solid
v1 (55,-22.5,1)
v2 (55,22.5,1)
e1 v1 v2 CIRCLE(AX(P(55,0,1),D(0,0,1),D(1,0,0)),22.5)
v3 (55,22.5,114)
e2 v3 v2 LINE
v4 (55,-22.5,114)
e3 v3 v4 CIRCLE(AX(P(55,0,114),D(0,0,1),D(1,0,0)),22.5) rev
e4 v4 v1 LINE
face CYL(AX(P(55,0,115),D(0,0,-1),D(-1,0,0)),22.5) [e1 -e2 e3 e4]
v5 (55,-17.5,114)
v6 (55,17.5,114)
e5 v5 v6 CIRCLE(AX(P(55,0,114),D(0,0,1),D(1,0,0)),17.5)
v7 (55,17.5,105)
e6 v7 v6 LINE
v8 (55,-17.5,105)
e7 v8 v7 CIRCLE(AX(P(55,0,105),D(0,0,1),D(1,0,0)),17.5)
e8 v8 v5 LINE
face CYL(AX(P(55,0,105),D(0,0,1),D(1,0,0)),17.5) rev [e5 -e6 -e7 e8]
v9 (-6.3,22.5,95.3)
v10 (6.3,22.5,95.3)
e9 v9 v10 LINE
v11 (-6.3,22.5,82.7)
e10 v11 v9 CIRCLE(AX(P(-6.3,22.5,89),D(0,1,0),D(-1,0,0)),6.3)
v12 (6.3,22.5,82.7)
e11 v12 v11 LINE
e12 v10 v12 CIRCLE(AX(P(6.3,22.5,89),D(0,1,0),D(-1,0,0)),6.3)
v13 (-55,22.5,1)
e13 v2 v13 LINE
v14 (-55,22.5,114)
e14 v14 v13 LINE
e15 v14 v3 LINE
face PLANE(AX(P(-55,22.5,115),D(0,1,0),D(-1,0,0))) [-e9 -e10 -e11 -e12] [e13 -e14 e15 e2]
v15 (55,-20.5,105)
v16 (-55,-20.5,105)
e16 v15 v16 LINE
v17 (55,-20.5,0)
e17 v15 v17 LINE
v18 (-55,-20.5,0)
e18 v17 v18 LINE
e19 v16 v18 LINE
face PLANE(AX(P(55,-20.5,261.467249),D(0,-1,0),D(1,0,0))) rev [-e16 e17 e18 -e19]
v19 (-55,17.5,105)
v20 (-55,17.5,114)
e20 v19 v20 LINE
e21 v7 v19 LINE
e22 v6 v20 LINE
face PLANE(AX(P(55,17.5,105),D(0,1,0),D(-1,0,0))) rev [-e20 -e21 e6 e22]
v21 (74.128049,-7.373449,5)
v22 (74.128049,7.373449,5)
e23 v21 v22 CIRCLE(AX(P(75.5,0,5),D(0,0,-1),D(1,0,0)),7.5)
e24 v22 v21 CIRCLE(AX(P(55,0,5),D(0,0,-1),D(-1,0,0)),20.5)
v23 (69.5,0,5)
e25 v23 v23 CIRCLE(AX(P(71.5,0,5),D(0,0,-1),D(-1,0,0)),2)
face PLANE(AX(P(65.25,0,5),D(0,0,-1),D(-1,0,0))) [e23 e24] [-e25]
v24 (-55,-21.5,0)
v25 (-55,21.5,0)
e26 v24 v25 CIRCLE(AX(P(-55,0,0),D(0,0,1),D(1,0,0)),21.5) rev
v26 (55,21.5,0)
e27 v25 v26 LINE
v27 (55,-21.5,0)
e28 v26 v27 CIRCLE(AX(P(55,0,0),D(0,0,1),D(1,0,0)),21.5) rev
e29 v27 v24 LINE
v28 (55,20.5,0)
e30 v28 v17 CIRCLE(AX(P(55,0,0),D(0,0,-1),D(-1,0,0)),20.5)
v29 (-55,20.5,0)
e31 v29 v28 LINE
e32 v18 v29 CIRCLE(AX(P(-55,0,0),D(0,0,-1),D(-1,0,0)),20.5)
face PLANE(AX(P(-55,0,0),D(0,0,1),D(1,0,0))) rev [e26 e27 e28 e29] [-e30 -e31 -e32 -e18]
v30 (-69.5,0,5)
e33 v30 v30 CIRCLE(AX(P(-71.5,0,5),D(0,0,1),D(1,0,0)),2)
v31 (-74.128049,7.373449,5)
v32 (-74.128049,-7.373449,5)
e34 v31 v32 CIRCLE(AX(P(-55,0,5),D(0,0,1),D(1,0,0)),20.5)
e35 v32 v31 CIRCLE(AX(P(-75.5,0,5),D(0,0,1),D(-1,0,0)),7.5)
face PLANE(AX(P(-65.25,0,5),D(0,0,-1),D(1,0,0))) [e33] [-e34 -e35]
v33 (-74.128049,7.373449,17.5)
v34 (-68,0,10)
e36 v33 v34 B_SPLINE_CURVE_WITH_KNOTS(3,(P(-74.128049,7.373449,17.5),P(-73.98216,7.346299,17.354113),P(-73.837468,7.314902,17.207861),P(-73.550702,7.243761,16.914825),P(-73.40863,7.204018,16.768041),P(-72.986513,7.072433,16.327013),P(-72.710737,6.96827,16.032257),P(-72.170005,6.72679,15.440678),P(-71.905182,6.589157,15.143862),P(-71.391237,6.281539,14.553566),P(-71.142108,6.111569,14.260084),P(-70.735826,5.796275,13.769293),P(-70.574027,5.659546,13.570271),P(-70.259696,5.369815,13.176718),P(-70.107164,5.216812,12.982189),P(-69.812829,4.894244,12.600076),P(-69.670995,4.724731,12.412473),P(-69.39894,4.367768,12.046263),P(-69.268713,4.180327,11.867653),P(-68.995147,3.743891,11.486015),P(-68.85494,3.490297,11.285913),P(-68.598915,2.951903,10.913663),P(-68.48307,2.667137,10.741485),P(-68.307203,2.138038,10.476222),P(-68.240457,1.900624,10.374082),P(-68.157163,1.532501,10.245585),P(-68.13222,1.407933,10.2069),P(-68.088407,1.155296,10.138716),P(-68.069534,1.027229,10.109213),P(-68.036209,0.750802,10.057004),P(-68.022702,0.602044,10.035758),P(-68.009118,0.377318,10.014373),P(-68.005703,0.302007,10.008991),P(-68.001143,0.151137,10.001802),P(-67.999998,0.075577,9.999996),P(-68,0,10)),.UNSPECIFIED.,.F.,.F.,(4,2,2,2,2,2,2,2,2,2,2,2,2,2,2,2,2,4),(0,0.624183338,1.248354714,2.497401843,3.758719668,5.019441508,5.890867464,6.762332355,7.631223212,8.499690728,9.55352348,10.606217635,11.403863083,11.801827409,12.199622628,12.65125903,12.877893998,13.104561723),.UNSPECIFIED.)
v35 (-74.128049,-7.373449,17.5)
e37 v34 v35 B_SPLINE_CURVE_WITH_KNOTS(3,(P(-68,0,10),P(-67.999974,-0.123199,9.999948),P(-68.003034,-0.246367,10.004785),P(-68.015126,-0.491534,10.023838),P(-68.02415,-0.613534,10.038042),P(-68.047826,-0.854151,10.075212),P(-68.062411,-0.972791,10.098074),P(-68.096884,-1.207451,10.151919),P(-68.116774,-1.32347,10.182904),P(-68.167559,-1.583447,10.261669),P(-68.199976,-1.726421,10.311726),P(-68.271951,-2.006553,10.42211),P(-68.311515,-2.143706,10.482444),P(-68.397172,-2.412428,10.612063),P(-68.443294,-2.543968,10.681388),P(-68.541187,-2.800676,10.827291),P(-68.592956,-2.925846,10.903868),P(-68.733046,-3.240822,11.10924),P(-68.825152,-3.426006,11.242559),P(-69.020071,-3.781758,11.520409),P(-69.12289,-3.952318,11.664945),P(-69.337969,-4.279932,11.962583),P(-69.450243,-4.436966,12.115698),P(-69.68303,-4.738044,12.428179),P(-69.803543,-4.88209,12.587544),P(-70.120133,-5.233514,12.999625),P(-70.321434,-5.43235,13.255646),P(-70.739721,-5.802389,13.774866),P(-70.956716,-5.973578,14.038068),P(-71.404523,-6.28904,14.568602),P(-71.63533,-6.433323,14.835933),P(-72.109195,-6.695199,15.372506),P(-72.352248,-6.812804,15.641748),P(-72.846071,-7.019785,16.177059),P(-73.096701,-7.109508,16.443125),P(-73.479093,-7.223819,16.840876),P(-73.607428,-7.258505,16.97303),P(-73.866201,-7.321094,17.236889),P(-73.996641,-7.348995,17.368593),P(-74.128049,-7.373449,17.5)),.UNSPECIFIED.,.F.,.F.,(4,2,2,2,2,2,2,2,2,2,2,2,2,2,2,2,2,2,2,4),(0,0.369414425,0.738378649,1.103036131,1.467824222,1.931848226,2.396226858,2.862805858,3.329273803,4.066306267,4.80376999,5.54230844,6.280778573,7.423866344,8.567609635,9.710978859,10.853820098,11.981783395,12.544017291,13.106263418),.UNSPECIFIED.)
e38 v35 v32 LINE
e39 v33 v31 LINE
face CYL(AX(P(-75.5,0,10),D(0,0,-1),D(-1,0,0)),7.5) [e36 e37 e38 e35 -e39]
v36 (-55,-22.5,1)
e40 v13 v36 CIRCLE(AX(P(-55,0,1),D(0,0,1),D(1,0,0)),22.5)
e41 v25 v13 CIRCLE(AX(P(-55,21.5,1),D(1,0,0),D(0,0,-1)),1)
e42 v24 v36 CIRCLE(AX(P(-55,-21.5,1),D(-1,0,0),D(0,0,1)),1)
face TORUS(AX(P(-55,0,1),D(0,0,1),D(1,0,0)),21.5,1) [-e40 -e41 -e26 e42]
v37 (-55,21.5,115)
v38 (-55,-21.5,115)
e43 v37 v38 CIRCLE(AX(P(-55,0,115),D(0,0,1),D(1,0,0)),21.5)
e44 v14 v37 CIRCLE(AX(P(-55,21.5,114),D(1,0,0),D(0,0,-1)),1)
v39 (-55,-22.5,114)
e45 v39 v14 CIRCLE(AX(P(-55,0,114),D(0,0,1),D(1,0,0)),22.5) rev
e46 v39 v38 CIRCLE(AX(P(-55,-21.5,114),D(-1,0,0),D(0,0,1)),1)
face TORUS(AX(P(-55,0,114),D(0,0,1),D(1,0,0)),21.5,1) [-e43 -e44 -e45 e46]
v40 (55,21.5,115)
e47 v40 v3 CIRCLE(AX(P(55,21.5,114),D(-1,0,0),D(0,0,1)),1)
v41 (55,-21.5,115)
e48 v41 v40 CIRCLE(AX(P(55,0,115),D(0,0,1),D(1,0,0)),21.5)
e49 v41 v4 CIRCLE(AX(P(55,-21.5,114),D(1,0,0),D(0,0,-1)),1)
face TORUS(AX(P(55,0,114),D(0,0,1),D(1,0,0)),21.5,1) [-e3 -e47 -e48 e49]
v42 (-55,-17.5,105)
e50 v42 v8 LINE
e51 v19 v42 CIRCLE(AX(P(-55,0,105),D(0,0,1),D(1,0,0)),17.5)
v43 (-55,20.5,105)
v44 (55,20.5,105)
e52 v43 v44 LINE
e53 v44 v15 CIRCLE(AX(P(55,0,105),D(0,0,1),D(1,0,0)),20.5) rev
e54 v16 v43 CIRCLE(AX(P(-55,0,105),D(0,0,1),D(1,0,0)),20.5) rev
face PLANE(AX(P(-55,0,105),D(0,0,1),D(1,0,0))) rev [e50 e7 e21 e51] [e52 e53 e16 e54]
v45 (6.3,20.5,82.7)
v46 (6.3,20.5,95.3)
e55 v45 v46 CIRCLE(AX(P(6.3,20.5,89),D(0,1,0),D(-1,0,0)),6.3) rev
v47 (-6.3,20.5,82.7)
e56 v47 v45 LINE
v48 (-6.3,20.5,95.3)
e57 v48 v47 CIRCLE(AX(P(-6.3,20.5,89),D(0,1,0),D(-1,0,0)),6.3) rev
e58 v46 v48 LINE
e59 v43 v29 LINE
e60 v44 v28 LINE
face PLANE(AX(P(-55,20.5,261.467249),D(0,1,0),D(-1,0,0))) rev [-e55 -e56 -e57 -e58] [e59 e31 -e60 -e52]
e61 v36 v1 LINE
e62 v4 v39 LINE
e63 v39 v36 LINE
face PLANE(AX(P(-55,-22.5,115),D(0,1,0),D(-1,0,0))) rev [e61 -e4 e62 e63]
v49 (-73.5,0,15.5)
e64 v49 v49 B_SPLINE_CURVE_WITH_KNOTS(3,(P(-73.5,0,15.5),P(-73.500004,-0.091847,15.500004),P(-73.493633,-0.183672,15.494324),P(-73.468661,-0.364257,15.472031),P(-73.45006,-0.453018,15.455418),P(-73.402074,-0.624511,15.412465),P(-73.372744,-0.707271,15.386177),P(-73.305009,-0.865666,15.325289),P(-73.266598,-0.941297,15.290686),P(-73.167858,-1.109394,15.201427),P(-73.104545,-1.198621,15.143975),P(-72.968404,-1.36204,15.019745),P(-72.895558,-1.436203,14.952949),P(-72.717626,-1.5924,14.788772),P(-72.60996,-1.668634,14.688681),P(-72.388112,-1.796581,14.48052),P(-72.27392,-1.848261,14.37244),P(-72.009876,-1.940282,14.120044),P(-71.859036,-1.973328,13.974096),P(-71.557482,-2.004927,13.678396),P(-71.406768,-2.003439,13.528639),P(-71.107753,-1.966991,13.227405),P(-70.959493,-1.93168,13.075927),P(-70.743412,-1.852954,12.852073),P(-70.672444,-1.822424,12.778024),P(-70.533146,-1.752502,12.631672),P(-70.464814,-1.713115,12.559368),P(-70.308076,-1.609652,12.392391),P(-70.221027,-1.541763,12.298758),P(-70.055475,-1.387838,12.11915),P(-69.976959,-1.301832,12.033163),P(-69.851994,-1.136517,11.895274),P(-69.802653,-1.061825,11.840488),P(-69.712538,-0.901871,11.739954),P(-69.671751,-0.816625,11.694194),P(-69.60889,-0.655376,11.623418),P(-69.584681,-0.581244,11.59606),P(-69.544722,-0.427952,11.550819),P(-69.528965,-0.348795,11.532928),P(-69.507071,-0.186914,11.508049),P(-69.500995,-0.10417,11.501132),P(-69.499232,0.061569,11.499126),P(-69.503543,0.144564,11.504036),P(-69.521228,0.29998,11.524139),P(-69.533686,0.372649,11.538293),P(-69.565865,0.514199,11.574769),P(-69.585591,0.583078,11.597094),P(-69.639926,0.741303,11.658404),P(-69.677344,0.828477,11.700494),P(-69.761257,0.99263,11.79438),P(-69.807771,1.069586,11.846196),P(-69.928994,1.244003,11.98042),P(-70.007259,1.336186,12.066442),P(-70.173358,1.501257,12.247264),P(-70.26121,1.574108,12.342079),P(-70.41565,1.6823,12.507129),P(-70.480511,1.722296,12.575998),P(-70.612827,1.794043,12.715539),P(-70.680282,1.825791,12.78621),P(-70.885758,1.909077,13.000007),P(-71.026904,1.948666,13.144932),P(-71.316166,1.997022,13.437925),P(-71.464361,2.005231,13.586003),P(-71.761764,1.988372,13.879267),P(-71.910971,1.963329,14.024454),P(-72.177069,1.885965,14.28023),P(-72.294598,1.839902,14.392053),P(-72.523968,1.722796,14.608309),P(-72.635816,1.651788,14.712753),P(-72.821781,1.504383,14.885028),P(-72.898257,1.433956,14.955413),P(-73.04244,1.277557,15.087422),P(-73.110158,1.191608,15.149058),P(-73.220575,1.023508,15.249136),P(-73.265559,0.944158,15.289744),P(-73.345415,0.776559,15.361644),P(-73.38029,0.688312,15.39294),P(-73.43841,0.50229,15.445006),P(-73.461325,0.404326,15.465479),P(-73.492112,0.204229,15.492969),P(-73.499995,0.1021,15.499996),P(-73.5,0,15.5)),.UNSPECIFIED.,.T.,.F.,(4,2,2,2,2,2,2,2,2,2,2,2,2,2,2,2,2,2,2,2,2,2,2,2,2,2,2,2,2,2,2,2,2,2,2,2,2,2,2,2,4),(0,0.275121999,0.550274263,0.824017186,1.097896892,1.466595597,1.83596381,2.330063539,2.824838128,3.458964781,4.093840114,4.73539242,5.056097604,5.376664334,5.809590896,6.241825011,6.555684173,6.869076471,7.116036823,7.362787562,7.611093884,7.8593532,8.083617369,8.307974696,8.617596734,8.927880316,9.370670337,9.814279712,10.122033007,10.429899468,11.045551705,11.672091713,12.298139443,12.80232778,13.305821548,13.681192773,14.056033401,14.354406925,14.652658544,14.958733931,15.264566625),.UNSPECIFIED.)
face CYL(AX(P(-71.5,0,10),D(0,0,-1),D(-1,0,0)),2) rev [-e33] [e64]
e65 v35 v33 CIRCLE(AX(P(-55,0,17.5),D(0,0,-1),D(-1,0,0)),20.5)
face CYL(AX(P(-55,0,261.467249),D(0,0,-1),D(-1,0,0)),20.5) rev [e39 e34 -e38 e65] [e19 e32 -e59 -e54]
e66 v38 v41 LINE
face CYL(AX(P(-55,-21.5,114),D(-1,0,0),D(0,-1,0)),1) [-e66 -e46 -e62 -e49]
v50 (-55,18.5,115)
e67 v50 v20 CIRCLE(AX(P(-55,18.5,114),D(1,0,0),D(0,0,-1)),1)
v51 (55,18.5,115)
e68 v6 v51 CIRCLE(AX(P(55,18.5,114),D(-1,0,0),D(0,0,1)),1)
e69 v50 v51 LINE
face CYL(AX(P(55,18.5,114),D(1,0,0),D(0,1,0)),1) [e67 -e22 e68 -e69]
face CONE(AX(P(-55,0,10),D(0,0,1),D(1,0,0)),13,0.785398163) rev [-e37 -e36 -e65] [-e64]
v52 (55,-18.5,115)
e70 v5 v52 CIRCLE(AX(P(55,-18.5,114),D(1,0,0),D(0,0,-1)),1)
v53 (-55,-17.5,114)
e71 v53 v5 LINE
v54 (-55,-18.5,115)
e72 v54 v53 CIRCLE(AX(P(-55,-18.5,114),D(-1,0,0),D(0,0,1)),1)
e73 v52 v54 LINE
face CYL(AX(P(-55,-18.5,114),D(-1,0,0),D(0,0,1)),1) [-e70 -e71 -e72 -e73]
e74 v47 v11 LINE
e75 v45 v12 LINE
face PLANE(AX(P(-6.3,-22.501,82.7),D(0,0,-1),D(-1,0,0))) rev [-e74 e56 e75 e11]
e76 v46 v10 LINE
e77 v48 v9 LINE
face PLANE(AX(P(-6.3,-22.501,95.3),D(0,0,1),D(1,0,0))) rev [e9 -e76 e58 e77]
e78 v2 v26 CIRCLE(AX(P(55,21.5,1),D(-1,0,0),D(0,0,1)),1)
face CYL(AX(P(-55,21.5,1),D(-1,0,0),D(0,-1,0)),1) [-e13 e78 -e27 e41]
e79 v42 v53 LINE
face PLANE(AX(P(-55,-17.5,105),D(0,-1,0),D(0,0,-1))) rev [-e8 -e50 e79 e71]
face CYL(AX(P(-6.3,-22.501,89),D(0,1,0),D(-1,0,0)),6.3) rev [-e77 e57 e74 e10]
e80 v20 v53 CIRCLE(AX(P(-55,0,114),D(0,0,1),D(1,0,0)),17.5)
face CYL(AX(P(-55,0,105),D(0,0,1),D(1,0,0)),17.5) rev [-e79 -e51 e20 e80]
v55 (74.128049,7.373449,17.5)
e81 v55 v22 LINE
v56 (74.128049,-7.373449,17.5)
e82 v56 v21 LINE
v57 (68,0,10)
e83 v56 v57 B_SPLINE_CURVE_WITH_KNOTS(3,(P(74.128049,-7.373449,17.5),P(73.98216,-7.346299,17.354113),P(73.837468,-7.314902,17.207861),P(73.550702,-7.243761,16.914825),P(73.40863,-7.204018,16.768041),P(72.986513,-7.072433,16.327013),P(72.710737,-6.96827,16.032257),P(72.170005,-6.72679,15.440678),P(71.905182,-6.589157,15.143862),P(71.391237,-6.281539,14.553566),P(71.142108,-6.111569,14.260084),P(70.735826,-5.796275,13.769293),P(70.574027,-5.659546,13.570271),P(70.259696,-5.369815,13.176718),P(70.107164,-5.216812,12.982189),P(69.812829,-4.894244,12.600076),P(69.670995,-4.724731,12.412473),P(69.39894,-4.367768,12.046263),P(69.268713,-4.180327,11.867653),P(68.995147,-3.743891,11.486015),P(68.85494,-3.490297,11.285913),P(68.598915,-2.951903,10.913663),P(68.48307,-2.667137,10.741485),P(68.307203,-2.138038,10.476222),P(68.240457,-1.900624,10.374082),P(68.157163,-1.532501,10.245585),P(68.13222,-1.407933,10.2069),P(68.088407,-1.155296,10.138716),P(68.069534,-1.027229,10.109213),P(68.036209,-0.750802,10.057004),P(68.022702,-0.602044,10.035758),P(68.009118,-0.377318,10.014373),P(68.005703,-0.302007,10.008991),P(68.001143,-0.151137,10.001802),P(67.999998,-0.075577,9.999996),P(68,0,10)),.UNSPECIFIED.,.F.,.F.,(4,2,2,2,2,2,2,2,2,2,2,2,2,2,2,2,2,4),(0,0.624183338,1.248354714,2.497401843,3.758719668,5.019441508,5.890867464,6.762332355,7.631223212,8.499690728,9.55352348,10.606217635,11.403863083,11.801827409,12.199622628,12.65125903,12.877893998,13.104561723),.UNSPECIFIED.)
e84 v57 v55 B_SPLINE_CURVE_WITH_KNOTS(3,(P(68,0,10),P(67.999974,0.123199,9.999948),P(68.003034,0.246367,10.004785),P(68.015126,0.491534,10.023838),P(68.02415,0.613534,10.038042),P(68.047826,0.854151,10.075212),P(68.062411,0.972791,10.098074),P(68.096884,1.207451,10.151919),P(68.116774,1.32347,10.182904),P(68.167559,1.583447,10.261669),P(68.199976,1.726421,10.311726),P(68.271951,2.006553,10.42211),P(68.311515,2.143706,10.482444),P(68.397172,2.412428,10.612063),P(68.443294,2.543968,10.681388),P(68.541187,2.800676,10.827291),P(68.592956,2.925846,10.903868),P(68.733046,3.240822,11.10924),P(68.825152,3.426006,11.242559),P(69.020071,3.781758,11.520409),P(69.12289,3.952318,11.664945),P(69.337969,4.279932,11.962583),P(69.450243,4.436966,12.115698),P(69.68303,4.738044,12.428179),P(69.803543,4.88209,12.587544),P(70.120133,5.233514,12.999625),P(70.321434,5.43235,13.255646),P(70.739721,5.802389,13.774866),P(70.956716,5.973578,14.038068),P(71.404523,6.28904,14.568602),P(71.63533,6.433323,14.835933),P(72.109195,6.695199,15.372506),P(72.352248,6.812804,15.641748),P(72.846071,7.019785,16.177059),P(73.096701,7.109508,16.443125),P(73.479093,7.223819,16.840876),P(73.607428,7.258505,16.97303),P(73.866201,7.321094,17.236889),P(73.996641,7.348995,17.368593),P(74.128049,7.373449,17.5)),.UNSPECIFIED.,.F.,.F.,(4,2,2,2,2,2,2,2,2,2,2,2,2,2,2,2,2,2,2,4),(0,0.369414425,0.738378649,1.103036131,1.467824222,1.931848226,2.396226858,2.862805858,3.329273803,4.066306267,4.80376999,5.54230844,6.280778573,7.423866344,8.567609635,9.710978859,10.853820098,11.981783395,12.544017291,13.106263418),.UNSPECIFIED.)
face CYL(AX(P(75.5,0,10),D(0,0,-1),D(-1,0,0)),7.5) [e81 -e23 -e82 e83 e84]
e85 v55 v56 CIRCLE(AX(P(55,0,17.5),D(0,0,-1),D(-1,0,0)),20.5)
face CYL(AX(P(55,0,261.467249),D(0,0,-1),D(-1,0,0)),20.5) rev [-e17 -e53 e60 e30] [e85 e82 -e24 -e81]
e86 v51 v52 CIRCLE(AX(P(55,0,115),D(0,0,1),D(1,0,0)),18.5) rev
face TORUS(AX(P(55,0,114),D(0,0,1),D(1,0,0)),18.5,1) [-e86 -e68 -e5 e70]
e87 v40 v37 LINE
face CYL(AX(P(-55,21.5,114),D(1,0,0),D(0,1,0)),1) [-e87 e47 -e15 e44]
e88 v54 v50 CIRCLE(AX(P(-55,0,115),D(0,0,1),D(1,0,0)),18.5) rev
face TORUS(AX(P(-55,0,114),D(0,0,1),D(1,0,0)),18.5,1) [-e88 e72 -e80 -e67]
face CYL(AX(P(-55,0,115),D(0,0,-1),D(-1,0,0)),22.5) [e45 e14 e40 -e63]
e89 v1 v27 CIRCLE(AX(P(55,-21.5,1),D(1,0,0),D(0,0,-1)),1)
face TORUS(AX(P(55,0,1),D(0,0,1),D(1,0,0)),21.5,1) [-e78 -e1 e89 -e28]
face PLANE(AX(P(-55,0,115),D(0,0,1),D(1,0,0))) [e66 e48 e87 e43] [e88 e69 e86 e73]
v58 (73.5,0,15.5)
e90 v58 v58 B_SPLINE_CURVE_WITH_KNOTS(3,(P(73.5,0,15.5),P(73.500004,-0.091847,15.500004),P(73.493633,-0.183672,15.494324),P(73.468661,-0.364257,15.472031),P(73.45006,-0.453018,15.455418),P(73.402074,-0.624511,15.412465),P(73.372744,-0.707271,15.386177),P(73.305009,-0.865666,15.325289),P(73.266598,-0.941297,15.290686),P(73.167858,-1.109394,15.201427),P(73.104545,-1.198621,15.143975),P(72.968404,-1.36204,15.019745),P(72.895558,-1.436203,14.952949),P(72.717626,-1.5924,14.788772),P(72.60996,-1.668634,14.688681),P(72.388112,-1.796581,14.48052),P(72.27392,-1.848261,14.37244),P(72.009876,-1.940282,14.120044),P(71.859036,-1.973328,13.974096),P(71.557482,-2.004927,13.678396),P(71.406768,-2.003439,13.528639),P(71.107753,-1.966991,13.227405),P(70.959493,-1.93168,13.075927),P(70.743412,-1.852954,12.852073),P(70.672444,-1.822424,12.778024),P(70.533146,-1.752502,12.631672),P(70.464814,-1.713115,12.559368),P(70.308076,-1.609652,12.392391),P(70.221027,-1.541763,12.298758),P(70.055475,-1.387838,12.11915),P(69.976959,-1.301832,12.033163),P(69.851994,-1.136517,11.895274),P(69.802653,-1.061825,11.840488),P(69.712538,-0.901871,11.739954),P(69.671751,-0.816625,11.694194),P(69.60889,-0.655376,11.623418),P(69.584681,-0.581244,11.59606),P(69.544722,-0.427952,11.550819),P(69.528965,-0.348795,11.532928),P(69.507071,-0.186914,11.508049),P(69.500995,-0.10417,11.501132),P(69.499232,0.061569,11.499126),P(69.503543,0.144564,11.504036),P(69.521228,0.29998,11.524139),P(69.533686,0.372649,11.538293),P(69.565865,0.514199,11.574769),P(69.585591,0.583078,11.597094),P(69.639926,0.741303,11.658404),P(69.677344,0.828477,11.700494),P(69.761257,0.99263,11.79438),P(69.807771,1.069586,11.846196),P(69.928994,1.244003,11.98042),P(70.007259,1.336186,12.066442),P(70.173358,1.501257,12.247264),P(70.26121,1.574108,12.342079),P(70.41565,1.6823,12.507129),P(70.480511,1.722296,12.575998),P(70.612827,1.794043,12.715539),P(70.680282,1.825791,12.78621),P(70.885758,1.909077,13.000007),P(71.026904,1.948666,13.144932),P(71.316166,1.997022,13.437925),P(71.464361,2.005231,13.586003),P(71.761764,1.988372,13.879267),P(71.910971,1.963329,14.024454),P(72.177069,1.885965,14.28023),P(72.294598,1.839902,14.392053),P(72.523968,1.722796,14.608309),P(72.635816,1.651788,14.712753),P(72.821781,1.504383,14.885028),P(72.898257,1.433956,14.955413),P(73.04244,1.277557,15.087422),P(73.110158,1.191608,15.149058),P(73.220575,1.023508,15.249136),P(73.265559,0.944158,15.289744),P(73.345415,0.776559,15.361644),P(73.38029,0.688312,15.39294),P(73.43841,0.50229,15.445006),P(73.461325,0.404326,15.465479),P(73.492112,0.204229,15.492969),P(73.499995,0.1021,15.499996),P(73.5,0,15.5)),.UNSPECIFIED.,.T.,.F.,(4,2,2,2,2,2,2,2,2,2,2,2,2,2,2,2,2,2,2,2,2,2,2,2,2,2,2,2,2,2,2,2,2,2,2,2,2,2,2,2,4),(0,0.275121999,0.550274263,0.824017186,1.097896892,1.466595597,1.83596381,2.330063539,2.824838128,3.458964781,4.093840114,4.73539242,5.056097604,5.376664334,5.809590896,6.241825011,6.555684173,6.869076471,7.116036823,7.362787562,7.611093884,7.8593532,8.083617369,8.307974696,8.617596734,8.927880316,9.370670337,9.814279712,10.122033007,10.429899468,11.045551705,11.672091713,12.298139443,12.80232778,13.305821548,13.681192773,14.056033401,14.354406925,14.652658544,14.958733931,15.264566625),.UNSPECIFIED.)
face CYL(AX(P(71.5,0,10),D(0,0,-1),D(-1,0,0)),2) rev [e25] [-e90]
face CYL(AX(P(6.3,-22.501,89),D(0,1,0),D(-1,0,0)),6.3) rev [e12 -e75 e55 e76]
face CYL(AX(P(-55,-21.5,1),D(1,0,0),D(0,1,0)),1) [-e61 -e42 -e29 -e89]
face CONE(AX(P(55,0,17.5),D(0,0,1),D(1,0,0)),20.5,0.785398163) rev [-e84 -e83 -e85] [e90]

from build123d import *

# Parameters (mm, degrees)
BOSS_EXTRU_1_DEPTH      = 115
ENL_V_MAT_EXTRU_1_DEPTH = 10
ENL_V_MAT_EXTRU_2_DEPTH = 105
ESQUISSE4_R             = 2
BOSS_EXTRU_2_DEPTH      = 5
CHANFREIN1_SIZE         = 7.5
ENL_V_MAT_EXTRU_3_REACH = 147.795
CONG_1_R                = 1


with BuildPart() as part:
    # Esquisse1 → Boss.-Extru.1 (new body)
    with BuildSketch(Plane.XY):
        with BuildLine():
            Line((-55, 22.5), (55, 22.5))
            ThreePointArc((55, 22.5), (77.5, 0), (55, -22.5))
            Line((55, -22.5), (-55, -22.5))
            ThreePointArc((-55, -22.5), (-77.5, 0), (-55, 22.5))
        make_face()
    extrude(amount=BOSS_EXTRU_1_DEPTH)

    # Esquisse2 → Enlèv. mat.-Extru.1 (cut)
    with BuildSketch(Plane.XY.offset(115)):
        with BuildLine():
            Line((-55, -17.5), (55, -17.5))
            ThreePointArc((55, -17.5), (72.5, 0), (55, 17.5))
            Line((55, 17.5), (-55, 17.5))
            ThreePointArc((-55, 17.5), (-72.5, 0), (-55, -17.5))
        make_face()
    extrude(amount=-ENL_V_MAT_EXTRU_1_DEPTH, mode=Mode.SUBTRACT)

    # Esquisse3 → Enlèv. mat.-Extru.2 (cut)
    with BuildSketch(Plane(origin=(0, 0, 0), x_dir=(-1, 0, 0), z_dir=(0, 0, -1))):
        with BuildLine():
            Line((55, 20.5), (-55, 20.5))
            ThreePointArc((-55, 20.5), (-75.5, 0), (-55, -20.5))
            Line((-55, -20.5), (55, -20.5))
            ThreePointArc((55, -20.5), (75.5, 0), (55, 20.5))
        make_face()
    extrude(amount=-ENL_V_MAT_EXTRU_2_DEPTH, mode=Mode.SUBTRACT)

    # Esquisse4 → Boss.-Extru.2 (add)
    with BuildSketch(Plane(origin=(0, 0, 5), x_dir=(-1, 0, 0), z_dir=(0, 0, -1))):
        with BuildLine():
            ThreePointArc((-74.12804878, 7.373448979), (-68, 0), (-74.12804878, -7.373448979))
            ThreePointArc((-74.12804878, -7.373448979), (-75.5, 0), (-74.12804878, 7.373448979))
        make_face()
        with Locations((-71.5, 0)):
            Circle(ESQUISSE4_R, mode=Mode.SUBTRACT)
    boss_extru_2 = extrude(amount=-BOSS_EXTRU_2_DEPTH)

    # Symétrie1: Boss.-Extru.2 across plane
    add(boss_extru_2.mirror(Plane(origin=(0, 0, 0), x_dir=(0, 0, 1), z_dir=(1, 0, 0))))

    # Chanfrein1
    # the kernel refuses this chamfer: 7.5 mm, written as the material it adds along each edge
    with BuildSketch(Plane(origin=(55, 0, 10), x_dir=(0.25894364440862044, -0.9658924313920169, 0), z_dir=(-0.9658924313920169, -0.25894364440862044, 0))) as chanfrein1_piece_1_section:
        Polygon((20.5, CHANFREIN1_SIZE), (20.5 - CHANFREIN1_SIZE, 0), (20.5, 0), align=None)
    chanfrein1_piece_1 = revolve(axis=Axis((55, 0, 10), (0, 0, 1)), revolution_arc=149.985218041, mode=Mode.PRIVATE)
    chanfrein1_piece_1 = chanfrein1_piece_1 & Plane(origin=(75.5, 0, 16.376958041), x_dir=(-0.1829268292682967, 0.9831265305818206, 0), z_dir=(0, 0, -1)) * Cylinder(7.5, 83, mode=Mode.PRIVATE)
    chanfrein1_piece_1 = chanfrein1_piece_1 - Plane(origin=(71.5, 0, 16.376958041), x_dir=(-1, 0, 0), z_dir=(0, 0, -1)) * Cylinder(2, 83, mode=Mode.PRIVATE)
    add(chanfrein1_piece_1)
    with BuildSketch(Plane(origin=(-55, 0, 10), x_dir=(-0.2589436444086207, -0.9658924313920167, 0), z_dir=(0.9658924313920167, -0.2589436444086207, 0))) as chanfrein1_piece_2_section:
        Polygon((20.5, -CHANFREIN1_SIZE), (20.5 - CHANFREIN1_SIZE, 0), (20.5, 0), align=None)
    chanfrein1_piece_2 = revolve(axis=Axis((-55, 0, 10), (0, 0, -1)), revolution_arc=149.985218041, mode=Mode.PRIVATE)
    chanfrein1_piece_2 = chanfrein1_piece_2 & Plane(origin=(-75.5, 0, 16.376958041), x_dir=(0.1829268292682967, 0.9831265305818206, 0), z_dir=(0, 0, -1)) * Cylinder(7.5, 83, mode=Mode.PRIVATE)
    chanfrein1_piece_2 = chanfrein1_piece_2 - Plane(origin=(-71.5, 0, 16.376958041), x_dir=(1, 0, 0), z_dir=(0, 0, -1)) * Cylinder(2, 83, mode=Mode.PRIVATE)
    add(chanfrein1_piece_2)

    # Esquisse5 → Enlèv. mat.-Extru.3 (cut, up to next)
    with BuildSketch(Plane(origin=(0, 22.5, 0), x_dir=(1, 0, 0), z_dir=(0, 1, 0)), mode=Mode.PRIVATE) as enl_v_mat_extru_3_sk1:
        with BuildLine():
            Line((-6.3, -82.7), (6.3, -82.7))
            ThreePointArc((6.3, -82.7), (12.6, -89), (6.3, -95.3))
            Line((6.3, -95.3), (-6.3, -95.3))
            ThreePointArc((-6.3, -95.3), (-12.6, -89), (-6.3, -82.7))
        make_face()
    enl_v_mat_extru_3_tool1 = extrude(enl_v_mat_extru_3_sk1.sketch, amount=-ENL_V_MAT_EXTRU_3_REACH, mode=Mode.PRIVATE) & part.part
    add(enl_v_mat_extru_3_tool1.solids().sort_by_distance((0, 22.5, 89))[0], mode=Mode.SUBTRACT)

    # Congé1
    cong_1_edges = [part.edges().sort_by_distance(p)[0] for p in [
        (77.5, 0, 115),
        (0, 22.5, 115),
        (-72.5, 0, 115),
        (0, -17.5, 115),
        (72.5, 0, 115),
        (0, 17.5, 115),
        (-77.5, 0, 115),
        (0, 22.5, 0),
        (77.5, 0, 0),
        (0, -22.5, 0),
        (-77.5, 0, 0),
        (0, -22.5, 115),
    ]]
    fillet(cong_1_edges, radius=CONG_1_R)


solid = part.part
